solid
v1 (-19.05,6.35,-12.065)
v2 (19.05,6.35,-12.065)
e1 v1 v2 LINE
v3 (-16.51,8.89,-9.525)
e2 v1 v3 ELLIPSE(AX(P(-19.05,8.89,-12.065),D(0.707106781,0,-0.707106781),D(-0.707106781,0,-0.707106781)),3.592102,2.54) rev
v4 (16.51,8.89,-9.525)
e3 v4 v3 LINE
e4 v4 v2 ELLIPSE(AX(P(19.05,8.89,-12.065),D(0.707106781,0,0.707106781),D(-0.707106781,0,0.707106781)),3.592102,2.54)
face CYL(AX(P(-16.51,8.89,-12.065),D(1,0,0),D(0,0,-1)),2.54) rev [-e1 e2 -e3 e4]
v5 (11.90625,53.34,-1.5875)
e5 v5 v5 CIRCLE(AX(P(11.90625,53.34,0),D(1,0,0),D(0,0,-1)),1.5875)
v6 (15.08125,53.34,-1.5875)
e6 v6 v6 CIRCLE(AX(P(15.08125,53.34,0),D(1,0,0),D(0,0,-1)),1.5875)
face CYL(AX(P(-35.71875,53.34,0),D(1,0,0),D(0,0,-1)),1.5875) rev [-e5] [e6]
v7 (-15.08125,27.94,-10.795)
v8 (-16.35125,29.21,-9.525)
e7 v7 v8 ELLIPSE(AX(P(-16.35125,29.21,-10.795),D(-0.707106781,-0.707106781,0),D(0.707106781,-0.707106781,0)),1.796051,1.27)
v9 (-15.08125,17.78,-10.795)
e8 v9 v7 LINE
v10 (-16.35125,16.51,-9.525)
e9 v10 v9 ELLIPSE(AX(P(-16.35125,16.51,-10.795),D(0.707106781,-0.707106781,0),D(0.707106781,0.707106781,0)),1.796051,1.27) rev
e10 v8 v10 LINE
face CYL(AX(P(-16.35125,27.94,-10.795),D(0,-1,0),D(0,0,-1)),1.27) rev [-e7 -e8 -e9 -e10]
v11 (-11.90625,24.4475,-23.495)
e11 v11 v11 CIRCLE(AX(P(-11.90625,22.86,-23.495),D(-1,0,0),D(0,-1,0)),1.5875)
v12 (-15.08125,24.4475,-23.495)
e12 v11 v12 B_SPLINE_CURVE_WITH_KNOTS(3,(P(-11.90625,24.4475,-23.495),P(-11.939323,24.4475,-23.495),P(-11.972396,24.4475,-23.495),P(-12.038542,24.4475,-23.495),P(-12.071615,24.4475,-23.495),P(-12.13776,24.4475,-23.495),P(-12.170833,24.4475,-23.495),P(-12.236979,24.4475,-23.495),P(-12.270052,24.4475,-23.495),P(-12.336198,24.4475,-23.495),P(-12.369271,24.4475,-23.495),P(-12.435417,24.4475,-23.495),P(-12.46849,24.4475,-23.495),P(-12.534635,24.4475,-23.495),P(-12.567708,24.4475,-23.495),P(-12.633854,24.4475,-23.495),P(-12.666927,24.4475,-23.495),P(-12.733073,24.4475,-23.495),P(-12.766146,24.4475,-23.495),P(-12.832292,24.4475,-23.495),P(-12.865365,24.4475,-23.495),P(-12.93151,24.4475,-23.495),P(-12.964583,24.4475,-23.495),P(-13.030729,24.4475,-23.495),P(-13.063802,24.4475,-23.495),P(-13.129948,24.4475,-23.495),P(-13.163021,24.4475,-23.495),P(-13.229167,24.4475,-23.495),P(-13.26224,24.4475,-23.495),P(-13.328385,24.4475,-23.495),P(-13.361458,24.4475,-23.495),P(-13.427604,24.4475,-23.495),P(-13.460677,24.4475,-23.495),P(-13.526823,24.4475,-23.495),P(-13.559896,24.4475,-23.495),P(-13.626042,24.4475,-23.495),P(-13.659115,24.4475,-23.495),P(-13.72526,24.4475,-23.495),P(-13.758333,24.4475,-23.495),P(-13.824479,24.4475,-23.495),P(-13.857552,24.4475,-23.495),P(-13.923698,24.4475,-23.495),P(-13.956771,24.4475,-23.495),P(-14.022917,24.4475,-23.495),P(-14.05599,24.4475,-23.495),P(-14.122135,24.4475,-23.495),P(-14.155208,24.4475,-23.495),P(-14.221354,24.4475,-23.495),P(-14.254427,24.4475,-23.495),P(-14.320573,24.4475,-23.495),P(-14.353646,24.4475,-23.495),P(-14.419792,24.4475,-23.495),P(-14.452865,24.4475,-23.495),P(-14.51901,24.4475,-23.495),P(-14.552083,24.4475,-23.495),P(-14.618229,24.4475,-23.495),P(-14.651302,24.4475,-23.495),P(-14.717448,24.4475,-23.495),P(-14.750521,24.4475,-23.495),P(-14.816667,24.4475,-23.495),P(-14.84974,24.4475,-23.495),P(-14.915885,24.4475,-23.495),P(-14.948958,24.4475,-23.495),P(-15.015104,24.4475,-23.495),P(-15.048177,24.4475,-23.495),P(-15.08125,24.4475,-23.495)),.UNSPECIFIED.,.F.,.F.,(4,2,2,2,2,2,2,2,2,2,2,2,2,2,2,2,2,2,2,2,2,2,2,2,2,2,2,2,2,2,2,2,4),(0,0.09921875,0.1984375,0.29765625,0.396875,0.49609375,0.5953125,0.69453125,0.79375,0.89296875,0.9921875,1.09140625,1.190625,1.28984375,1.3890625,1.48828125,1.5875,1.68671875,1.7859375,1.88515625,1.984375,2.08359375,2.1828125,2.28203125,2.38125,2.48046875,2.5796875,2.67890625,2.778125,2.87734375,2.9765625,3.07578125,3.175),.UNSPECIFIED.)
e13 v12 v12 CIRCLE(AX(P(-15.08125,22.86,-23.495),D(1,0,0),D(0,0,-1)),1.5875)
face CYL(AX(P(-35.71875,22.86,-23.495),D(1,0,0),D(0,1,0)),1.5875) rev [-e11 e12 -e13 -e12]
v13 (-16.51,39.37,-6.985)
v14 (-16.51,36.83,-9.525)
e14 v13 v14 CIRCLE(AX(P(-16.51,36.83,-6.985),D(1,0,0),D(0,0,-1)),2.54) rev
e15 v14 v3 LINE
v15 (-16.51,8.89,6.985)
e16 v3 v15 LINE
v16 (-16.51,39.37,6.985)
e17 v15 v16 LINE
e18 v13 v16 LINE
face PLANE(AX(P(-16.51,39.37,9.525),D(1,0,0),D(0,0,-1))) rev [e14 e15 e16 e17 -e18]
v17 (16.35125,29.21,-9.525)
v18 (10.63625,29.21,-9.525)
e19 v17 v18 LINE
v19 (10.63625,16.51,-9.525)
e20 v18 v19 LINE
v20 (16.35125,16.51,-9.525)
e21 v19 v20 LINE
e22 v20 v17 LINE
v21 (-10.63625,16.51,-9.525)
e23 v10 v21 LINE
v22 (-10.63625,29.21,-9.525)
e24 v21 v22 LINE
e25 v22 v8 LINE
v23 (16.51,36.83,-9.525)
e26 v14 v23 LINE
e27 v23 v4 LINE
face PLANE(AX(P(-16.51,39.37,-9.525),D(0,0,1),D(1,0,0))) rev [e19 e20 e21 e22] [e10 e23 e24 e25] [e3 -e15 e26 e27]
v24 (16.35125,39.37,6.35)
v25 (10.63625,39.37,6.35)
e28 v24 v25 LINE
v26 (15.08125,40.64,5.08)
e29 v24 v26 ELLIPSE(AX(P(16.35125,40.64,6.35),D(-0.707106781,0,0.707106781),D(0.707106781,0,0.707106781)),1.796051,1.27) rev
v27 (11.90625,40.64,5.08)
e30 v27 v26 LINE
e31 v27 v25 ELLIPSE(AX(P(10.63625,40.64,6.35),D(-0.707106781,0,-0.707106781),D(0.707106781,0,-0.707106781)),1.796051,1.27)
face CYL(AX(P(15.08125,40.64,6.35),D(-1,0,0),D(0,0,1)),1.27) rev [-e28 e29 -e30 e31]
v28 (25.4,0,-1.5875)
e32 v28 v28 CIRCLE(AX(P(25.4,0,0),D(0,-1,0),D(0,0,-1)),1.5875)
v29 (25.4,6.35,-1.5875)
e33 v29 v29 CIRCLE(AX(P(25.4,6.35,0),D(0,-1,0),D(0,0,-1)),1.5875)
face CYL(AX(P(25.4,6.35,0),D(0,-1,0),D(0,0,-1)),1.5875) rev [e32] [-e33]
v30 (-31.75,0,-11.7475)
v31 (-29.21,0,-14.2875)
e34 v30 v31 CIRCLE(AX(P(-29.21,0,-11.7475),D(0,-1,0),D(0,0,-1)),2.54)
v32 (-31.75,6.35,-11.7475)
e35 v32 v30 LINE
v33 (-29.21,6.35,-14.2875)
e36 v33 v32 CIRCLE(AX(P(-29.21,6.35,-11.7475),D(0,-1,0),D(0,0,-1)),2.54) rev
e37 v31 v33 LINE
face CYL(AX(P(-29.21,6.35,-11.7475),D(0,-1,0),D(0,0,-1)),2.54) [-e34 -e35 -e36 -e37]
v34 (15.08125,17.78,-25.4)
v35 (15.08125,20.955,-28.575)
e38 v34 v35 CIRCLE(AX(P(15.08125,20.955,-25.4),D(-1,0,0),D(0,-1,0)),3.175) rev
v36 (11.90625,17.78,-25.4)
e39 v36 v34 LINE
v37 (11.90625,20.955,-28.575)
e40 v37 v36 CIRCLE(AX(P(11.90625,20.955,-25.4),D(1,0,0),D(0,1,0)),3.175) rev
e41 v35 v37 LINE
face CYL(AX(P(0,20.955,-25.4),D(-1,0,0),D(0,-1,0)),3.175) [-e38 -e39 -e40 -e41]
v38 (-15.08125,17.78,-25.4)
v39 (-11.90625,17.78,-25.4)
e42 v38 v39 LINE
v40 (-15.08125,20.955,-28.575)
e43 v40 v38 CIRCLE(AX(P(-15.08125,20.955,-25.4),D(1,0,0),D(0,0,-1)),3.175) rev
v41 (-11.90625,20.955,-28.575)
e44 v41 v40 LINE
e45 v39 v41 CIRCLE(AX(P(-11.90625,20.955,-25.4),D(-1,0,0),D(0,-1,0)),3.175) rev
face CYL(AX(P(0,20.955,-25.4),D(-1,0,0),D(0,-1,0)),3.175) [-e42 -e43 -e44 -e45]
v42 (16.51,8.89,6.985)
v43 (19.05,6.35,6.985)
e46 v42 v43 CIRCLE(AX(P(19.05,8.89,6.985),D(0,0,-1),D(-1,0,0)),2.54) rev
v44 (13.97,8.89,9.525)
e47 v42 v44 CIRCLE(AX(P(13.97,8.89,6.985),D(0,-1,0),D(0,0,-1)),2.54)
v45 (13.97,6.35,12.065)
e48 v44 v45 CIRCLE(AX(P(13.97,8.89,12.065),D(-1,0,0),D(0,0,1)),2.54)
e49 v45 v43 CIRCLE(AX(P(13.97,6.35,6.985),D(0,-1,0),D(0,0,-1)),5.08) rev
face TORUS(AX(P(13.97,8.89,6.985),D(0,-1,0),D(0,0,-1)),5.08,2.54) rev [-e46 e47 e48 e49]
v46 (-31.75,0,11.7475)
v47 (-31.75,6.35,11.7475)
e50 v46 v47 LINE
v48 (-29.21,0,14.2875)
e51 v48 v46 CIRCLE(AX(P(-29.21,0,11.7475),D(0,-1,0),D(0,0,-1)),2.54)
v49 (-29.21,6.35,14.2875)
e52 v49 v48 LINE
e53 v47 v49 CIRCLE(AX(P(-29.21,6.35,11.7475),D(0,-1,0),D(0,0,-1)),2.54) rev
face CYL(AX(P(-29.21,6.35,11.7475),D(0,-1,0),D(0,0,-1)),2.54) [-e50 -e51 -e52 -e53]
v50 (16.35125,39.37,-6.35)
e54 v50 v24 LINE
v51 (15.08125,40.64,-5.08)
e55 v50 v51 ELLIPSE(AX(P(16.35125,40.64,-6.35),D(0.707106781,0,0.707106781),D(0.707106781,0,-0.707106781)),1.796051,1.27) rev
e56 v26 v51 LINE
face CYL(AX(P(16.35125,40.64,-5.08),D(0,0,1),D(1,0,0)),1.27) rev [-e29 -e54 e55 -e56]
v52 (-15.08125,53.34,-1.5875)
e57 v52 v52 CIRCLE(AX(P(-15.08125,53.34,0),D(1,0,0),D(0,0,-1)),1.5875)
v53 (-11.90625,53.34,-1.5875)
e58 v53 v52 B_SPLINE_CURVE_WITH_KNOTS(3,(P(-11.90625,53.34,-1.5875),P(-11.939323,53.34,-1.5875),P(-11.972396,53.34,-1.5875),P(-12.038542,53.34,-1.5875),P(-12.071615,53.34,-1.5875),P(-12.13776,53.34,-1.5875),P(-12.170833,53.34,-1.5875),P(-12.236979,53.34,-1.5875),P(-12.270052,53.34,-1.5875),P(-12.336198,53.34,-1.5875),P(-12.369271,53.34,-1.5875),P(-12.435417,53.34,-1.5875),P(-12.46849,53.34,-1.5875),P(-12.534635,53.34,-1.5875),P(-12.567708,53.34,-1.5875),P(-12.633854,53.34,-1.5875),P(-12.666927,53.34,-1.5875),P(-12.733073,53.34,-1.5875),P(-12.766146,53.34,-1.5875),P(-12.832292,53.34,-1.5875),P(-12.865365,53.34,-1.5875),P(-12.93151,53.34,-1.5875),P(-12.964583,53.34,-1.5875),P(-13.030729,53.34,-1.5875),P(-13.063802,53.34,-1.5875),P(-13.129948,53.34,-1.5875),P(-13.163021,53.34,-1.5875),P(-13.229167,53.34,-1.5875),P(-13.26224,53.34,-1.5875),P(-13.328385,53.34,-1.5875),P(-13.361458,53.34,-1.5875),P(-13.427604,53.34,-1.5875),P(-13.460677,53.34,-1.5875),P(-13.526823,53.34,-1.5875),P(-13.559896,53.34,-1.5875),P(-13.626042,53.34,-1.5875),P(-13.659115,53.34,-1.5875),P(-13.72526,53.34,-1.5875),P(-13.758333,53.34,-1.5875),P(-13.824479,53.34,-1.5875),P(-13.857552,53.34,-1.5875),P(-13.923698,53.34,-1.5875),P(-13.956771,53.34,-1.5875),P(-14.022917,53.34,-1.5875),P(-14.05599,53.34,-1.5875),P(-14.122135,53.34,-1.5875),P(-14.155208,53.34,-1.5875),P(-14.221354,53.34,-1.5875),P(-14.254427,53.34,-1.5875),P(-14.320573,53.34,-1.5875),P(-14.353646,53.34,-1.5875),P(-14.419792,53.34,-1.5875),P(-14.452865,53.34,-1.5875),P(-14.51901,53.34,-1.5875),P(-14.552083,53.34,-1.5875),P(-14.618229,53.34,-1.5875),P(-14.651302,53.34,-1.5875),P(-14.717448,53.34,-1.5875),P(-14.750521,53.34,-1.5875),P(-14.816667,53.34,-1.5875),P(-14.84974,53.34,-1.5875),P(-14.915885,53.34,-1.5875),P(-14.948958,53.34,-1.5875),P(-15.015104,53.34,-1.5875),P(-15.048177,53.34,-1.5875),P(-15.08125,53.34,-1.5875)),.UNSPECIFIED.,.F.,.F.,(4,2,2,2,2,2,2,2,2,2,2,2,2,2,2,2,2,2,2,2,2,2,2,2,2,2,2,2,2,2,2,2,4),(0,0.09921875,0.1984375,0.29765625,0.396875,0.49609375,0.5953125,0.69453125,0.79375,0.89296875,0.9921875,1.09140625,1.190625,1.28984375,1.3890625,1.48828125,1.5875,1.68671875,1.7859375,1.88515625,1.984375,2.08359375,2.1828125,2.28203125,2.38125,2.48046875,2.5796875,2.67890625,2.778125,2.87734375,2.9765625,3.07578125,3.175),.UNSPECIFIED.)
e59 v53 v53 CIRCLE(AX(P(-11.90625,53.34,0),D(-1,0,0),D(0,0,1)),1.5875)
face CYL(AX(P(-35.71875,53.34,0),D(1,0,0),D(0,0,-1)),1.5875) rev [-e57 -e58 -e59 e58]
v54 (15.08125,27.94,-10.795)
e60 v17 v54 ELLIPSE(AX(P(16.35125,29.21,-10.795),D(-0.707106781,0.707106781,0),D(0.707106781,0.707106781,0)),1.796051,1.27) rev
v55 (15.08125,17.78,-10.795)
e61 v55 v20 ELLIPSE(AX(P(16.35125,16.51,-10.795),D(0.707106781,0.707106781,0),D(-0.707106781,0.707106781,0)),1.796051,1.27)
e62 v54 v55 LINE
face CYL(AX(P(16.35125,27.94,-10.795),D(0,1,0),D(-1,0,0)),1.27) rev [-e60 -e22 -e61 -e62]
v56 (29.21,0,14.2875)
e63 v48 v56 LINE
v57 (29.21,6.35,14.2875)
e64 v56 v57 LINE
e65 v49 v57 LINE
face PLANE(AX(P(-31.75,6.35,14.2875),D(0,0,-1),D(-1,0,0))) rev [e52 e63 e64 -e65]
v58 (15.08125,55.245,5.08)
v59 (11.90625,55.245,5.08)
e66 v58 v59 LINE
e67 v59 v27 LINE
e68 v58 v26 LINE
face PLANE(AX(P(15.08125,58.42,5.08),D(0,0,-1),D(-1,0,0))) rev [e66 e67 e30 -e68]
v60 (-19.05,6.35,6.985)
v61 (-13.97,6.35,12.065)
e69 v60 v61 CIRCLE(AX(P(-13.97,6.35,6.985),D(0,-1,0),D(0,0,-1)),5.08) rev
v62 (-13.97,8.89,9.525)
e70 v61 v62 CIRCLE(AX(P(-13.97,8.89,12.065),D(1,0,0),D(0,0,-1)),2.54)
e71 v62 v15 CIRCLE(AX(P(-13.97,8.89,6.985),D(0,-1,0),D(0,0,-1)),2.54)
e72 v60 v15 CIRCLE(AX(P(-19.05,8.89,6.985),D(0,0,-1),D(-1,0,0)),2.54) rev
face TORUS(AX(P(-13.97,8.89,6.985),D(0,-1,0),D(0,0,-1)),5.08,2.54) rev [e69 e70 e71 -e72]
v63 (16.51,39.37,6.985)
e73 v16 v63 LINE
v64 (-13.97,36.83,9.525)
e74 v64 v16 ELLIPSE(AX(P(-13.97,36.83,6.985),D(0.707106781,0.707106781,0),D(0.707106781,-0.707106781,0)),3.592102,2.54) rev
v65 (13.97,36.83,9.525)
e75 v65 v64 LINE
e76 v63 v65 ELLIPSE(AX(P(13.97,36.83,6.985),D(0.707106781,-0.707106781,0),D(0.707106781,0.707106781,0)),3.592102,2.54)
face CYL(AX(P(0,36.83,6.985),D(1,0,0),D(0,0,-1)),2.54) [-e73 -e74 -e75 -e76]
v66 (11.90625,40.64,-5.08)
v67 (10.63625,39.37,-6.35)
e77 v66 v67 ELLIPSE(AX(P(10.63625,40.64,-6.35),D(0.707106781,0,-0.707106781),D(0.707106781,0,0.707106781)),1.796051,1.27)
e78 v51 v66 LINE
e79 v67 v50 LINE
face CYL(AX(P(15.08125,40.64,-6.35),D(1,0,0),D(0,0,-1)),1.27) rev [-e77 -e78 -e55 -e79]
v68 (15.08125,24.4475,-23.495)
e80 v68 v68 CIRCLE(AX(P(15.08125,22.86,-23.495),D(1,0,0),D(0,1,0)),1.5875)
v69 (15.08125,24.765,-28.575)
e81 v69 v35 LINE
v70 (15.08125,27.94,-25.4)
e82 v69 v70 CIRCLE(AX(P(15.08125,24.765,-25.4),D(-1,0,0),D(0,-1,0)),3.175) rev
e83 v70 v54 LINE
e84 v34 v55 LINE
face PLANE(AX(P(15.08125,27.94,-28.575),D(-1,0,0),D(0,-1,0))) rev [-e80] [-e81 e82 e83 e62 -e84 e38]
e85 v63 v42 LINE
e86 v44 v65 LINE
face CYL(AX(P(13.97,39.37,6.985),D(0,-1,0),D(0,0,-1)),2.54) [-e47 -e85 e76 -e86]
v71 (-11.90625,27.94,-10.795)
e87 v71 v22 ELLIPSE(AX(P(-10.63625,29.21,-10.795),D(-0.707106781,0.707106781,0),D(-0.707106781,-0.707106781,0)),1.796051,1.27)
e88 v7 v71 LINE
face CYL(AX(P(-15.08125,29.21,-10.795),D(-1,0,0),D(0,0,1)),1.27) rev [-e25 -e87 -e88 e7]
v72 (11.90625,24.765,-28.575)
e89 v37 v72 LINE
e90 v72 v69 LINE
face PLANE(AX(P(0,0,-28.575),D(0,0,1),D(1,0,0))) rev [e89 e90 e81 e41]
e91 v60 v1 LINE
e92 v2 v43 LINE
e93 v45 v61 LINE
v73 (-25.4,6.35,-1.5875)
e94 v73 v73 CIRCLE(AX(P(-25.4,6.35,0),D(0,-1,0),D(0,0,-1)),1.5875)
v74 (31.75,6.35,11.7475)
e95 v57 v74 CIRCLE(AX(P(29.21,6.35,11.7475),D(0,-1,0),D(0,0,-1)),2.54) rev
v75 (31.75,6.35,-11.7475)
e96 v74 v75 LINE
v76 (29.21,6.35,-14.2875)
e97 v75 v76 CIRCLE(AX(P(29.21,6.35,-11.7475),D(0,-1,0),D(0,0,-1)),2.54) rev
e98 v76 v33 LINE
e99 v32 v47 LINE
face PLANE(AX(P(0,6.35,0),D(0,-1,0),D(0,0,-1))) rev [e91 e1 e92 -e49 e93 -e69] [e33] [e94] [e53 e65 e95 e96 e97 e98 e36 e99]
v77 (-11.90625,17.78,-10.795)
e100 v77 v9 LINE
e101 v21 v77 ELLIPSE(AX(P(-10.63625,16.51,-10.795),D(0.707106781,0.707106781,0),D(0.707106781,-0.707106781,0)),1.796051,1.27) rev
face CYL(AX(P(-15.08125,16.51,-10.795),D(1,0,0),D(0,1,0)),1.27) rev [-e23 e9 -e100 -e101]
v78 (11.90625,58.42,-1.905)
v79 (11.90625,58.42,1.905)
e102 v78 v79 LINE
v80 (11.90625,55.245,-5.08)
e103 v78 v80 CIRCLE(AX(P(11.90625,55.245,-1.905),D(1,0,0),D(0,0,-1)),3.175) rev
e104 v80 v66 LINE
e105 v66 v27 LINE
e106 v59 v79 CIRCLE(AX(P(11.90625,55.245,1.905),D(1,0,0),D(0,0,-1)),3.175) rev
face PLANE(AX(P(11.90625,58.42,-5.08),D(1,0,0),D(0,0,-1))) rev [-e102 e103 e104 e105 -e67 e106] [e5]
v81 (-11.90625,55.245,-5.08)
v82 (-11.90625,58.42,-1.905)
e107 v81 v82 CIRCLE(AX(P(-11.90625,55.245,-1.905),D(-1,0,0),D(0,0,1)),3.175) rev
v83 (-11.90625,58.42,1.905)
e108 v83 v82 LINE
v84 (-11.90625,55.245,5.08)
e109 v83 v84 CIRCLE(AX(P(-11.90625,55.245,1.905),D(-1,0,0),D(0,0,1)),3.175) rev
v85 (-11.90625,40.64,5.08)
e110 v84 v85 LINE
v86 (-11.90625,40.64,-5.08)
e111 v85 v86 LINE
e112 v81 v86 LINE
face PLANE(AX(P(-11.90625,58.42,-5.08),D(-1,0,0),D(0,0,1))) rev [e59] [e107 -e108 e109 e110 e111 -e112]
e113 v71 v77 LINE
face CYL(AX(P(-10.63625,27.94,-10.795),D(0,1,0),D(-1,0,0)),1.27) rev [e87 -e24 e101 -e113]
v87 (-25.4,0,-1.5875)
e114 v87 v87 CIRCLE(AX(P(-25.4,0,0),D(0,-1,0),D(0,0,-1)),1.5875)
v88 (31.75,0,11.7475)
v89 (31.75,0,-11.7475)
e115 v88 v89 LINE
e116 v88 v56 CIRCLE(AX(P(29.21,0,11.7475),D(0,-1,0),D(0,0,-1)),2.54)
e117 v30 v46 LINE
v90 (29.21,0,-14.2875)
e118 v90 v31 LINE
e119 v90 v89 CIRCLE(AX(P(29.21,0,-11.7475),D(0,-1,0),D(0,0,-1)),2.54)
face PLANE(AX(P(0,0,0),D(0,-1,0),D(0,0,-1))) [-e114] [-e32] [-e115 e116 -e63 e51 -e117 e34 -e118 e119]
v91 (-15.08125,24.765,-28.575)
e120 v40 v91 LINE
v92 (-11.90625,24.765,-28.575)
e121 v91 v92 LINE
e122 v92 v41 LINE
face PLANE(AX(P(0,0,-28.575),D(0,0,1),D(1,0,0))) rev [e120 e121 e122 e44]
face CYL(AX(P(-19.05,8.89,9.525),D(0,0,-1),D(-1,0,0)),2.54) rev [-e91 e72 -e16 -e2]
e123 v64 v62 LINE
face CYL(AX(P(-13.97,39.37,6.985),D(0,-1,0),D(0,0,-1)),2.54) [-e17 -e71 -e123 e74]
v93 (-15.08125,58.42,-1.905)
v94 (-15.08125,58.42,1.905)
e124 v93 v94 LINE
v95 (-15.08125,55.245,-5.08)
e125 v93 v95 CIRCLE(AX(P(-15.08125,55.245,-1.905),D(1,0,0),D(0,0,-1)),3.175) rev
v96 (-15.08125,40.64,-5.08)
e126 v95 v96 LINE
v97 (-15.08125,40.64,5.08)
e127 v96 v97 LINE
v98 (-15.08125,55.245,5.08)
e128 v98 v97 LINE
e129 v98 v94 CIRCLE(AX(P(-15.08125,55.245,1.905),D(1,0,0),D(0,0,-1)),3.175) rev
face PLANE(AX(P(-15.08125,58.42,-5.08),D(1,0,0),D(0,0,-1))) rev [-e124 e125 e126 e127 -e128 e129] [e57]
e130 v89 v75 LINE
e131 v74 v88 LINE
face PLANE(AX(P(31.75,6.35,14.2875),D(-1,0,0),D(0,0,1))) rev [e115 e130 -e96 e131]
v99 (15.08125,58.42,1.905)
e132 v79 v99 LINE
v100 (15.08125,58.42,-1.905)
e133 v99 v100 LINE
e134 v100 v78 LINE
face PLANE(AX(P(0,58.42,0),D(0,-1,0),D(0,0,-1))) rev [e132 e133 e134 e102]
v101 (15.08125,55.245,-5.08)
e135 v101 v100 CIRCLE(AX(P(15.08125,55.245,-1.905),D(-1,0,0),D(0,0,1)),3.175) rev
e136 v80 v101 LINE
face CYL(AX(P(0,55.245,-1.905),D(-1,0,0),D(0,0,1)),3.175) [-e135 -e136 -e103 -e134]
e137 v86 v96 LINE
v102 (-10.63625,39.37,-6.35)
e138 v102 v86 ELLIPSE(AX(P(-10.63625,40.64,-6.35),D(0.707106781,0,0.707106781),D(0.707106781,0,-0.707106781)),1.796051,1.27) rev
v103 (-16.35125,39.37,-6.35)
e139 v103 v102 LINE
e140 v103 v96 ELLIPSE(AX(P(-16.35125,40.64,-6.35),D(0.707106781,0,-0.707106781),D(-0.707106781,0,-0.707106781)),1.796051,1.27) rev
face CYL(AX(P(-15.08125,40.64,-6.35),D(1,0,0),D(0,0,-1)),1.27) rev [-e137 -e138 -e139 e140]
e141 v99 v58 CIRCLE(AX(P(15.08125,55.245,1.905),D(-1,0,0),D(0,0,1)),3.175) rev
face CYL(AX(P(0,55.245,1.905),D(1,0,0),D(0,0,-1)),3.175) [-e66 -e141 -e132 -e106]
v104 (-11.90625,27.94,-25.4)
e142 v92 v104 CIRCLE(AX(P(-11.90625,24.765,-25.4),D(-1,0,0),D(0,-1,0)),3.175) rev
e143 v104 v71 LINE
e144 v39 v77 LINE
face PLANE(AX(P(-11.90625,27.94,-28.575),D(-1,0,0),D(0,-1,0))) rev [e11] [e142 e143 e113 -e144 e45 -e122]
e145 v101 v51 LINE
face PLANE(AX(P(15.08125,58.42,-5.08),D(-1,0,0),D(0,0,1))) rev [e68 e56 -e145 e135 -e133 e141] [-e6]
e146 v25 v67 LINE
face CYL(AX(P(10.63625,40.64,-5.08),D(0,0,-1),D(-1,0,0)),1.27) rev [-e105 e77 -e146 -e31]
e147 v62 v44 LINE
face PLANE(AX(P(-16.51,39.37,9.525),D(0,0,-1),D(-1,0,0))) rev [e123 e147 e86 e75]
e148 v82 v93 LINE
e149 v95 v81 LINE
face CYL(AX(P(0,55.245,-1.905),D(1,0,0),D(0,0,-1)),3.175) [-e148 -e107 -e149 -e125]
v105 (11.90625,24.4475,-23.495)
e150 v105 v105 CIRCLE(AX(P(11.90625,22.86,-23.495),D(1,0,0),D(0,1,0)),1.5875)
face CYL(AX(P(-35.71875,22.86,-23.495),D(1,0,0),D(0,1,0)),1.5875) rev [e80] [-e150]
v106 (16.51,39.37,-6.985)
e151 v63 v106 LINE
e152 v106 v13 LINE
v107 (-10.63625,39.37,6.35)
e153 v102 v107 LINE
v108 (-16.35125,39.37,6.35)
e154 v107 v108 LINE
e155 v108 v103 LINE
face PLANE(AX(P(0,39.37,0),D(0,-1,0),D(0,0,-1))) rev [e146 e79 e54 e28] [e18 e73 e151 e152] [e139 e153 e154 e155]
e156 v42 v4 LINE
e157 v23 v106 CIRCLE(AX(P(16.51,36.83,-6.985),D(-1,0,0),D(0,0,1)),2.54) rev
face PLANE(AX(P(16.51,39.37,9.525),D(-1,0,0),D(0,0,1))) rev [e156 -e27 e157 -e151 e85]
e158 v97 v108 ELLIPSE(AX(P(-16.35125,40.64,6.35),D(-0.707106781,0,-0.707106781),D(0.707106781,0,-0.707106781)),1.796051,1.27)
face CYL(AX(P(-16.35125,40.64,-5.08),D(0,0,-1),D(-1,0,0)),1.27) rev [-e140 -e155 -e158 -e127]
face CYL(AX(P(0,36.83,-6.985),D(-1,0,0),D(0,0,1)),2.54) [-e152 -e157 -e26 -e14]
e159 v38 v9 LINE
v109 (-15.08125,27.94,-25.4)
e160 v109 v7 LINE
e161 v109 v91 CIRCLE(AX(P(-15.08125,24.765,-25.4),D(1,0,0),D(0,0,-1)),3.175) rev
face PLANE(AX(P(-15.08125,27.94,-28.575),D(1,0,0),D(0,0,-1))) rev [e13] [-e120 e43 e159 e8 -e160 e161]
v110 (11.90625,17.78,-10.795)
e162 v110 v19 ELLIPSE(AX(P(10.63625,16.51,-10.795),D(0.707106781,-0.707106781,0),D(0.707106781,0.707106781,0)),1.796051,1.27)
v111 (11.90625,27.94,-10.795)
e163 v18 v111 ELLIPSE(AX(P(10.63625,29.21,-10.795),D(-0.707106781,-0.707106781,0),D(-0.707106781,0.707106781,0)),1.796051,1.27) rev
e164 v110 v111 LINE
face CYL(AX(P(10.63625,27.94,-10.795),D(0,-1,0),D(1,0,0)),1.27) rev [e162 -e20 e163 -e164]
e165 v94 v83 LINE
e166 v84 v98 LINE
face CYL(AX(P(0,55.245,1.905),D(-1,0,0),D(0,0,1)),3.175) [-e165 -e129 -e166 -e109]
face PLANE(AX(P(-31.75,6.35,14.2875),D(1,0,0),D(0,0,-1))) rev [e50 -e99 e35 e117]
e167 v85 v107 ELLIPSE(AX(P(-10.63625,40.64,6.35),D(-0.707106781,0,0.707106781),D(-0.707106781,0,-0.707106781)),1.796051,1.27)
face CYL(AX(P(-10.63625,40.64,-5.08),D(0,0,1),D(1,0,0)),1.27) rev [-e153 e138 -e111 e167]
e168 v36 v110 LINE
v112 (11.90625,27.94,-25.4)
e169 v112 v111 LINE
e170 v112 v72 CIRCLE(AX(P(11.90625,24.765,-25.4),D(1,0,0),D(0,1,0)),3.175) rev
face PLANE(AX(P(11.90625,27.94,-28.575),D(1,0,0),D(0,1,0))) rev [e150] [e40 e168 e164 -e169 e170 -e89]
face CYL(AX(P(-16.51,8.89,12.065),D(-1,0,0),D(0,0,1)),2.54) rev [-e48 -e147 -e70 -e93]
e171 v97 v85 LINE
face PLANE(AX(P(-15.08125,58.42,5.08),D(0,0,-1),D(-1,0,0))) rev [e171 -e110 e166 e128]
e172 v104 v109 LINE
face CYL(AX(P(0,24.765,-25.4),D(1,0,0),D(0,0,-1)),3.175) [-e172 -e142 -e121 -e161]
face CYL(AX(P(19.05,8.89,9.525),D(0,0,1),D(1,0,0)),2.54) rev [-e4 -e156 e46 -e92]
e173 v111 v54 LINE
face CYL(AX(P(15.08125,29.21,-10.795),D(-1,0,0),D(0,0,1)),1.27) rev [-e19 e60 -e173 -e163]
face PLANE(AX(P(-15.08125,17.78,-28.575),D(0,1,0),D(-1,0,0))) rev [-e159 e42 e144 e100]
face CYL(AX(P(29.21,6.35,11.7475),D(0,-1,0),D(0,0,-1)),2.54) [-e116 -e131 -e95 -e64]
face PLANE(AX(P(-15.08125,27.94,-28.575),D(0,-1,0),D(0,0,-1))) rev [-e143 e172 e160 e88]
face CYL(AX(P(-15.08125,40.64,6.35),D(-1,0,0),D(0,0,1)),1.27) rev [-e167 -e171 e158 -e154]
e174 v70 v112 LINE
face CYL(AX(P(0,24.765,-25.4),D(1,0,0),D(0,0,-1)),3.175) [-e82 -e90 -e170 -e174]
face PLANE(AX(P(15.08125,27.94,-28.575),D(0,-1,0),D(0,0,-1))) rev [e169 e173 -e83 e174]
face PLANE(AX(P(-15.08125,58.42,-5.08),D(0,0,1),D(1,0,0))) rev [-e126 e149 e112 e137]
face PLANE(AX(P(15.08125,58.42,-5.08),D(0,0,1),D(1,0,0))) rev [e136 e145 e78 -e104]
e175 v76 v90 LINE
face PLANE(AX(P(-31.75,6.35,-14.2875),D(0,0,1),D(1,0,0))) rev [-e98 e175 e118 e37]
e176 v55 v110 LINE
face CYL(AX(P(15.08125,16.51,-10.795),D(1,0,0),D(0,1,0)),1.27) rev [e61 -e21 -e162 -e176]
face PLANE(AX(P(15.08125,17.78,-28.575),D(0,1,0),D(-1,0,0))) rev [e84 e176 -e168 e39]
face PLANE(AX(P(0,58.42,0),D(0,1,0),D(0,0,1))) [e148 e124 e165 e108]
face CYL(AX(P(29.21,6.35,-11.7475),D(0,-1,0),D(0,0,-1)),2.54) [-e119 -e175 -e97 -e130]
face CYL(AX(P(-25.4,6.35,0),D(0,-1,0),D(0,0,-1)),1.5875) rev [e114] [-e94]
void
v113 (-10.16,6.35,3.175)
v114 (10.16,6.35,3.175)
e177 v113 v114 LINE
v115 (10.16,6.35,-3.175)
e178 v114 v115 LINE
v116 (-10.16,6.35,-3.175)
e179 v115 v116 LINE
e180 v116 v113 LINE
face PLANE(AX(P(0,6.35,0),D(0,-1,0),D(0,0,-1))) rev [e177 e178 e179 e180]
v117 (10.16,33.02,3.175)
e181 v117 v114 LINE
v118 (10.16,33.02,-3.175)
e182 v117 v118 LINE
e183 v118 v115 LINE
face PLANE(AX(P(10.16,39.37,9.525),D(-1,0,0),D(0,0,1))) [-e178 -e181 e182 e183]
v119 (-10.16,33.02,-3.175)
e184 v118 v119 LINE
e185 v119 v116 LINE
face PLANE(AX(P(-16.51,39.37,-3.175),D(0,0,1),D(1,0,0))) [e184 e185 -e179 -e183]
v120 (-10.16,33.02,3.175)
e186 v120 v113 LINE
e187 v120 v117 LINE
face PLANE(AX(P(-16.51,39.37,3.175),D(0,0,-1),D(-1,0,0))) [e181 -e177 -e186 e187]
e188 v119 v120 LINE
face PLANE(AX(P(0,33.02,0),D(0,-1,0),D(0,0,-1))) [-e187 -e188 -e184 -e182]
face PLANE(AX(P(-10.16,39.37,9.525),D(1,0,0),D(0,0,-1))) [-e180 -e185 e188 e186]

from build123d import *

# Parameters (mm, degrees)
SKETCH1_W           = 63.5
SKETCH1_H           = 28.575
BOSS_EXTRUDE1_DEPTH = 6.35
FILLET1_R           = 2.54
SKETCH2_W           = 33.02
SKETCH2_H           = 19.05
BOSS_EXTRUDE3_DEPTH = 33.02
SHELL1_START        = 6.35
SHELL1_OUTLINE_W    = 20.32
SHELL1_OUTLINE_H    = 6.35
SHELL1_DEPTH        = 26.67
SKETCH3_R           = 1.5875
CUT_EXTRUDE1_DEPTH  = 6.35
SKETCH4_W           = 3.175
SKETCH4_H           = 10.16
BOSS_EXTRUDE4_DEPTH = 19.05
FILLET4_R           = 1.27
FILLET6_R           = 3.175
SKETCH5_R           = 1.5875
CUT_EXTRUDE2_DEPTH  = 50.8
SKETCH8_W           = 3.175
SKETCH8_H           = 10.16
BOSS_EXTRUDE5_DEPTH = 19.05
SKETCH9_R           = 1.5875
CUT_EXTRUDE3_DEPTH  = 50.8
FILLET7_R           = 1.27
FILLET8_R           = 2.54
FILLET9_R           = 3.175


# Read off the part's stored shape, not the designer's step: Shell1
with BuildPart() as part:
    # Sketch1 → Boss-Extrude1 (new body)
    with BuildSketch(Plane(origin=(0, 0, 0), x_dir=(1, 0, 0), z_dir=(0, 1, 0))):
        Rectangle(SKETCH1_W, SKETCH1_H)
    extrude(amount=BOSS_EXTRUDE1_DEPTH)

    # Fillet1
    fillet1_edges = [part.edges().sort_by_distance(p)[0] for p in [
        (31.75, 3.175, 14.2875),
        (-31.75, 3.175, 14.2875),
        (-31.75, 3.175, -14.2875),
        (31.75, 3.175, -14.2875),
    ]]
    fillet(fillet1_edges, radius=FILLET1_R)

    # Sketch2 → Boss-Extrude3 (add)
    with BuildSketch(Plane(origin=(0, 6.35, 0), x_dir=(1, 0, 0), z_dir=(0, 1, 0))):
        Rectangle(SKETCH2_W, SKETCH2_H)
    extrude(amount=BOSS_EXTRUDE3_DEPTH)

    # Shell1 outline → Shell1 (cut)
    with BuildSketch(Plane(origin=(0, 0, 0), x_dir=(1, 0, 0), z_dir=(0, 1, 0)).offset(SHELL1_START)):
        Rectangle(SHELL1_OUTLINE_W, SHELL1_OUTLINE_H)
    extrude(amount=SHELL1_DEPTH, mode=Mode.SUBTRACT)

    # Sketch3 → Cut-Extrude1 (cut)
    with BuildSketch(Plane.XZ):
        with Locations(Location((-25.4, 0, 0), (0, 0, 270))):
            Circle(SKETCH3_R)
        with Locations(Location((25.4, 0, 0), (0, 0, 270))):
            Circle(SKETCH3_R)
    extrude(amount=-CUT_EXTRUDE1_DEPTH, mode=Mode.SUBTRACT)

    # Sketch4 → Boss-Extrude4 (add)
    with BuildSketch(Plane(origin=(0, 39.37, 0), x_dir=(1, 0, 0), z_dir=(0, 1, 0))):
        with Locations((-13.49375, 0)):
            Rectangle(SKETCH4_W, SKETCH4_H)
        with Locations((13.49375, 0)):
            Rectangle(SKETCH4_W, SKETCH4_H)
    extrude(amount=BOSS_EXTRUDE4_DEPTH)

    # Fillet4
    fillet4_edges = [part.edges().sort_by_distance(p)[0] for p in [
        (15.08125, 39.37, 0),
        (13.49375, 39.37, -5.08),
        (11.90625, 39.37, 0),
        (13.49375, 39.37, 5.08),
        (-15.08125, 39.37, 0),
        (-13.49375, 39.37, 5.08),
        (-11.90625, 39.37, 0),
        (-13.49375, 39.37, -5.08),
    ]]
    fillet(fillet4_edges, radius=FILLET4_R)

    # Fillet6
    fillet6_edges = [part.edges().sort_by_distance(p)[0] for p in [
        (13.49375, 58.42, -5.08),
        (13.49375, 58.42, 5.08),
        (-13.49375, 58.42, 5.08),
        (-13.49375, 58.42, -5.08),
    ]]
    fillet(fillet6_edges, radius=FILLET6_R)

    # Sketch5 → Cut-Extrude2 (cut)
    with BuildSketch(Plane(origin=(15.08125, 0, 0), x_dir=(0, 0, -1), z_dir=(1, 0, 0))):
        with Locations((0, 53.34)):
            Circle(SKETCH5_R)
    extrude(amount=-CUT_EXTRUDE2_DEPTH, mode=Mode.SUBTRACT)

    # Sketch8 → Boss-Extrude5 (add)
    with BuildSketch(Plane(origin=(0, 0, -9.525), x_dir=(-1, 0, 0), z_dir=(0, 0, -1))):
        with Locations((-13.49375, 22.86)):
            Rectangle(SKETCH8_W, SKETCH8_H)
        with Locations((13.49375, 22.86)):
            Rectangle(SKETCH8_W, SKETCH8_H)
    extrude(amount=BOSS_EXTRUDE5_DEPTH)

    # Sketch9 → Cut-Extrude3 (cut)
    with BuildSketch(Plane(origin=(15.08125, 0, 0), x_dir=(0, 0, -1), z_dir=(1, 0, 0))):
        with Locations(Location((23.495, 22.86, 0), (0, 0, 90))):
            Circle(SKETCH9_R)
    extrude(amount=-CUT_EXTRUDE3_DEPTH, mode=Mode.SUBTRACT)

    # Fillet7
    fillet7_edges = [part.edges().sort_by_distance(p)[0] for p in [
        (-15.08125, 22.86, -9.525),
        (-13.49375, 27.94, -9.525),
        (-11.90625, 22.86, -9.525),
        (-13.49375, 17.78, -9.525),
        (13.49375, 17.78, -9.525),
        (11.90625, 22.86, -9.525),
        (13.49375, 27.94, -9.525),
        (15.08125, 22.86, -9.525),
    ]]
    fillet(fillet7_edges, radius=FILLET7_R)

    # Fillet8
    fillet8_edges = [part.edges().sort_by_distance(p)[0] for p in [
        (16.51, 6.35, 0),
        (16.51, 22.86, 9.525),
        (0, 6.35, -9.525),
        (-16.51, 6.35, 0),
        (0, 6.35, 9.525),
        (-16.51, 22.86, 9.525),
        (0, 39.37, -9.525),
        (0, 39.37, 9.525),
    ]]
    fillet(fillet8_edges, radius=FILLET8_R)

    # Fillet9
    fillet9_edges = [part.edges().sort_by_distance(p)[0] for p in [
        (-13.49375, 27.94, -28.575),
        (-13.49375, 17.78, -28.575),
        (13.49375, 17.78, -28.575),
        (13.49375, 27.94, -28.575),
    ]]
    fillet(fillet9_edges, radius=FILLET9_R)


solid = part.part
